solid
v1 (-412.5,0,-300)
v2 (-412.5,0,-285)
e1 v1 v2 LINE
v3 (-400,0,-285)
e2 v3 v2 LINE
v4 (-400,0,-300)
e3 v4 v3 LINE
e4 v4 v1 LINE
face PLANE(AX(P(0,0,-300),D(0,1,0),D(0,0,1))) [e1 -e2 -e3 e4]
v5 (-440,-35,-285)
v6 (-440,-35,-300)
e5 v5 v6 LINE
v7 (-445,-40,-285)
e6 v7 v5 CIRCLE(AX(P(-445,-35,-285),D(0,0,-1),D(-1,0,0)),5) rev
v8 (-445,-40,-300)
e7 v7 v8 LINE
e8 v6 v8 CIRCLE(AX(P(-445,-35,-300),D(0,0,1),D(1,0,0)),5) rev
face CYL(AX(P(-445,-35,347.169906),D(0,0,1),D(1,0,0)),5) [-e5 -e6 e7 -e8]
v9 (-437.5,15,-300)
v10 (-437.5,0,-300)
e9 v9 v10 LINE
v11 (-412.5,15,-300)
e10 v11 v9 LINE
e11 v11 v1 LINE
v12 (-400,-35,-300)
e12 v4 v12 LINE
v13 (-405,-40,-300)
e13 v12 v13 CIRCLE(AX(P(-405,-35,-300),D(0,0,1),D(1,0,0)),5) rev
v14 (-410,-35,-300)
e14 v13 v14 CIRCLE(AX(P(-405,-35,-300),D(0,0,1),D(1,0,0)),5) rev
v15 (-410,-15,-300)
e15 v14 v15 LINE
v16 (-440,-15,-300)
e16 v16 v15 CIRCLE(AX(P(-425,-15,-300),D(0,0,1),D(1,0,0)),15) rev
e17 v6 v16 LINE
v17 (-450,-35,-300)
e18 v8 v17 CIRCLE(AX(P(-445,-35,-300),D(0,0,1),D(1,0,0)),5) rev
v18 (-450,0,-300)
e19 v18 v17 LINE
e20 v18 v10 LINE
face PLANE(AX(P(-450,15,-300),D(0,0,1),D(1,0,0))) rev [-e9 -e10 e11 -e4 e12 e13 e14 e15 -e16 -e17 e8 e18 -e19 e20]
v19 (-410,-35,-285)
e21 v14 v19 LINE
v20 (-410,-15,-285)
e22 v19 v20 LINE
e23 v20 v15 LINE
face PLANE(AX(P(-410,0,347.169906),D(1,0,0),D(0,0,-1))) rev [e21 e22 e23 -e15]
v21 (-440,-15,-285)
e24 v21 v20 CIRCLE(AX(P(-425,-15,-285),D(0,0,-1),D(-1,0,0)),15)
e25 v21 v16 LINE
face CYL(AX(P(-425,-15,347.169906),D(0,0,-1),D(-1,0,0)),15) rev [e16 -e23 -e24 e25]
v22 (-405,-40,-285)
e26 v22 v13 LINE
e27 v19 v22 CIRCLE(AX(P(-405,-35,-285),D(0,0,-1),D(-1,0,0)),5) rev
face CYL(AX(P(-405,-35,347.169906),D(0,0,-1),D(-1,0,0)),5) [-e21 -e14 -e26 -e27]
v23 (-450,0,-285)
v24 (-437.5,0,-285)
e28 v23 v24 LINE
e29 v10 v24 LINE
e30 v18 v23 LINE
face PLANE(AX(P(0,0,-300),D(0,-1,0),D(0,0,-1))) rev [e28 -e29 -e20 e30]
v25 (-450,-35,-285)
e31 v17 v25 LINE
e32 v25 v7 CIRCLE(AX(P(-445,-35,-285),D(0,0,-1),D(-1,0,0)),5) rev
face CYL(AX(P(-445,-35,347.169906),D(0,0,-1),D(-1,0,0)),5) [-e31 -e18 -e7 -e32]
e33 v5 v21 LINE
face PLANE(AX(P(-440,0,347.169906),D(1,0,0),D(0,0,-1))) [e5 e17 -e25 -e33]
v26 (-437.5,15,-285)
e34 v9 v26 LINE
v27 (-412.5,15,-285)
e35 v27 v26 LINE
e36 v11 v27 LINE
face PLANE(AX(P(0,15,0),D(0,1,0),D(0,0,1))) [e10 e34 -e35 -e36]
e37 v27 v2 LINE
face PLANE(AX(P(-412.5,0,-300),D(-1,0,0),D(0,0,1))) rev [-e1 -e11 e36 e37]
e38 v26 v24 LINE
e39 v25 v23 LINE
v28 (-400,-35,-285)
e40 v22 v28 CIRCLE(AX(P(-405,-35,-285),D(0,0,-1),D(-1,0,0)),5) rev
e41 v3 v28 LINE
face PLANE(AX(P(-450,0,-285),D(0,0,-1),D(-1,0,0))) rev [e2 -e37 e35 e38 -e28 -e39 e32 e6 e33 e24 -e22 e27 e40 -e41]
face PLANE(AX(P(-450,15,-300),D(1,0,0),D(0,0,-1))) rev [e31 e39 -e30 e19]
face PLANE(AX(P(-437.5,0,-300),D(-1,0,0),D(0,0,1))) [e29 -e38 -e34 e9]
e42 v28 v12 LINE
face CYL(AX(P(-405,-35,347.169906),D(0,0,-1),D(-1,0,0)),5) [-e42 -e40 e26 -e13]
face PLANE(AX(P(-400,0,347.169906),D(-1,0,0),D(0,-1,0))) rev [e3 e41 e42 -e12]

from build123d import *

# Parameters (mm, degrees)
BOSS_EXTRUDE1_DEPTH             = 15
BOSS_EXTRUDE2_REACH             = 1239.023
BOSS_EXTRUDE2_DIRECTION_2_REACH = 1239.023
CUT_EXTRUDE2_DEPTH              = 1238.578280352
CUT_EXTRUDE2_DEPTH_BACK         = 1238.578280352
SKETCH5_W                       = 40
SKETCH5_H                       = 40
CUT_EXTRUDE3_DEPTH              = 1238.578280352
BOSS_EXTRUDE4_DEPTH             = 75
CUT_EXTRUDE4_DEPTH              = 1241.107934819
CUT_EXTRUDE4_DEPTH_BACK         = 1241.107934819
SKETCH8_W                       = 15
SKETCH8_H                       = 73.7
FILLET1_R                       = 5
CUT_EXTRUDE5_DEPTH              = 1241.107934819
CUT_EXTRUDE5_DEPTH_BACK         = 1241.107934819
SKETCH10_W                      = 12.5
SKETCH10_H                      = 15
CUT_EXTRUDE6_DEPTH              = 453.023229492


with BuildPart() as part:
    # Sketch1 → Boss-Extrude1 (new body)
    with BuildSketch(Plane(origin=(0, 0, 0), x_dir=(1, 0, 0), z_dir=(0, 1, 0))):
        Polygon((-450, 300), (-400, 300), (-200, 250), (600, 40), (1200, 40), (1200, -40), (600, -40), (-200, -250), (-400, -300), (-450, -300), align=None)
    extrude(amount=BOSS_EXTRUDE1_DEPTH)

    # Boss-Extrude2: up to this face of the body (flat: up to its plane)
    boss_extrude2_end = Plane(part.part.faces().sort_by_distance((-425, 7.5, 300))[0])
    # Sketch2 → Boss-Extrude2 (add, up to the picked face)
    with BuildSketch(Plane.XY, mode=Mode.PRIVATE) as boss_extrude2_sk1:
        with BuildLine():
            Line((-425, 0), (-450, 0))
            Line((-450, 0), (-450, -40))
            Line((-450, -40), (-440, -40))
            Line((-440, -40), (-440, -15))
            ThreePointArc((-440, -15), (-435.606601718, -4.393398282), (-425, 0))
        make_face()
    boss_extrude2_tool1 = split(extrude(boss_extrude2_sk1.sketch, amount=BOSS_EXTRUDE2_REACH, mode=Mode.PRIVATE), bisect_by=boss_extrude2_end, keep=Keep.BOTH, mode=Mode.PRIVATE)
    # Sketch2 → Boss-Extrude2 (add, up to the picked face)
    with BuildSketch(Plane.XY, mode=Mode.PRIVATE) as boss_extrude2_sk2:
        with BuildLine():
            Line((-400, 0), (-425, 0))
            ThreePointArc((-425, 0), (-414.393398282, -4.393398282), (-410, -15))
            Line((-410, -15), (-410, -40))
            Line((-410, -40), (-400, -40))
            Line((-400, -40), (-400, 0))
        make_face()
    boss_extrude2_tool2 = split(extrude(boss_extrude2_sk2.sketch, amount=BOSS_EXTRUDE2_REACH, mode=Mode.PRIVATE), bisect_by=boss_extrude2_end, keep=Keep.BOTH, mode=Mode.PRIVATE)
    add(boss_extrude2_tool1.solids().sort_by(Axis((-444.100555, -18.206662, 0), (0, 0, 1)))[0])
    add(boss_extrude2_tool2.solids().sort_by(Axis((-405.899445, -18.206662, 0), (0, 0, 1)))[0])

    # Boss-Extrude2 direction 2: up to this face of the body (flat: up to its plane)
    boss_extrude2_direction_2_end = Plane(part.part.faces().sort_by_distance((-425, 7.5, -300))[0])
    # Sketch2 → Boss-Extrude2 direction 2 (add, up to the picked face)
    with BuildSketch(Plane.XY, mode=Mode.PRIVATE) as boss_extrude2_direction_2_sk1:
        with BuildLine():
            Line((-425, 0), (-450, 0))
            Line((-450, 0), (-450, -40))
            Line((-450, -40), (-440, -40))
            Line((-440, -40), (-440, -15))
            ThreePointArc((-440, -15), (-435.606601718, -4.393398282), (-425, 0))
        make_face()
    boss_extrude2_direction_2_tool1 = split(extrude(boss_extrude2_direction_2_sk1.sketch, amount=-BOSS_EXTRUDE2_DIRECTION_2_REACH, mode=Mode.PRIVATE), bisect_by=boss_extrude2_direction_2_end, keep=Keep.BOTH, mode=Mode.PRIVATE)
    # Sketch2 → Boss-Extrude2 direction 2 (add, up to the picked face)
    with BuildSketch(Plane.XY, mode=Mode.PRIVATE) as boss_extrude2_direction_2_sk2:
        with BuildLine():
            Line((-400, 0), (-425, 0))
            ThreePointArc((-425, 0), (-414.393398282, -4.393398282), (-410, -15))
            Line((-410, -15), (-410, -40))
            Line((-410, -40), (-400, -40))
            Line((-400, -40), (-400, 0))
        make_face()
    boss_extrude2_direction_2_tool2 = split(extrude(boss_extrude2_direction_2_sk2.sketch, amount=-BOSS_EXTRUDE2_DIRECTION_2_REACH, mode=Mode.PRIVATE), bisect_by=boss_extrude2_direction_2_end, keep=Keep.BOTH, mode=Mode.PRIVATE)
    add(boss_extrude2_direction_2_tool1.solids().sort_by(Axis((-444.100555, -18.206662, 0), (0, 0, -1)))[0])
    add(boss_extrude2_direction_2_tool2.solids().sort_by(Axis((-405.899445, -18.206662, 0), (0, 0, -1)))[0])

    # Sketch4 → Cut-Extrude2 (cut, two sides: drawn at the far end of the back side and taken through both)
    with BuildSketch(Plane(origin=(0, 0, 0), x_dir=(1, 0, 0), z_dir=(0, 1, 0)).offset(-CUT_EXTRUDE2_DEPTH_BACK)):
        Polygon((-450, 230), (-400, 230), (-150, 167.5), (-150, -167.5), (-400, -230), (-450, -230), align=None)
        Polygon((-100, 155), (-100, -155), (520, 0), align=None)
    extrude(amount=CUT_EXTRUDE2_DEPTH + CUT_EXTRUDE2_DEPTH_BACK, mode=Mode.SUBTRACT)

    # Sketch5 → Cut-Extrude3 (cut, through all)
    with BuildSketch(Plane(origin=(0, 0, 0), x_dir=(0, 0, -1), z_dir=(1, 0, 0))):
        with Locations((-265, -20)):
            Rectangle(SKETCH5_W, SKETCH5_H)
        with Locations((265, -20)):
            Rectangle(SKETCH5_W, SKETCH5_H)
    extrude(amount=-CUT_EXTRUDE3_DEPTH, mode=Mode.SUBTRACT)

    # Sketch7 → Boss-Extrude4 (add)
    with BuildSketch(Plane(origin=(1200, 0, 0), x_dir=(0, 0, -1), z_dir=(1, 0, 0))):
        with BuildLine():
            Line((-87.5, 50), (-40, 15))
            Line((-40, 15), (40, 15))
            Line((40, 15), (87.5, 50))
            Line((87.5, 50), (87.5, 88.7))
            Line((87.5, 88.7), (58.5, 88.7))
            Line((58.5, 88.7), (58.5, 63.2))
            Line((58.5, 63.2), (48.5, 63.2))
            Line((48.5, 63.2), (48.5, 88.7))
            Line((48.5, 88.7), (20, 88.7))
            Line((20, 88.7), (20, 50))
            ThreePointArc((20, 50), (0, 30), (-20, 50))
            Line((-20, 50), (-20, 88.7))
            Line((-20, 88.7), (-63, 88.7))
            Line((-63, 88.7), (-63, 63.2))
            Line((-63, 63.2), (-73, 63.2))
            Line((-73, 63.2), (-73, 88.7))
            Line((-73, 88.7), (-87.5, 88.7))
            Line((-87.5, 88.7), (-87.5, 50))
        make_face()
    extrude(amount=-BOSS_EXTRUDE4_DEPTH)

    # Sketch8 → Cut-Extrude4 (cut, two sides: drawn at the far end of the back side and taken through both)
    with BuildSketch(Plane.XY.offset(-CUT_EXTRUDE4_DEPTH_BACK)):
        with Locations((1147.5, 51.85)):
            Rectangle(SKETCH8_W, SKETCH8_H)
        with Locations((1177.5, 51.85)):
            Rectangle(SKETCH8_W, SKETCH8_H)
    extrude(amount=CUT_EXTRUDE4_DEPTH + CUT_EXTRUDE4_DEPTH_BACK, mode=Mode.SUBTRACT)

    # Fillet1
    # the kernel refuses this fillet: 5 mm, written as the material it adds along each edge
    with BuildSketch(Plane(origin=(600, 0, -40), x_dir=(1, 0, 0), z_dir=(0, 1, 0)), Plane(origin=(600, 0, 40), x_dir=(-0.9672309653794254, 0, 0.25389812841213444), z_dir=(0, 1, 0))) as fillet1_piece_1:
        with BuildLine():
            CenterArc((FILLET1_R * 0.12906371081, FILLET1_R), FILLET1_R, 255.2916961, 14.7083039)
            Line((-FILLET1_R * 0.124834417602, FILLET1_R * 0.0327690346206), (0, 0))
            Line((0, 0), (FILLET1_R * 0.12906371081, 0))
        make_face()
    extrude(amount=15)
    with BuildSketch(Plane(origin=(-150, 15, -167.5), x_dir=(-0.9701425001453314, 0, -0.2425356250363347), z_dir=(0, -1, 0)), Plane(origin=(-150, 15, 167.5), x_dir=(0, 0, -1), z_dir=(0, -1, 0))) as fillet1_piece_2:
        with BuildLine():
            CenterArc((FILLET1_R * 0.780776406404, -FILLET1_R), FILLET1_R, 90, 75.963756532)
            Line((-FILLET1_R * 0.189366093741, -FILLET1_R * 0.757464374964), (0, 0))
            Line((0, 0), (FILLET1_R * 0.780776406404, 0))
        make_face()
    extrude(amount=15)
    with BuildSketch(Plane(origin=(-100, 15, -155), x_dir=(0.9701425001453314, 0, 0.24253562503633508), z_dir=(0, -1, 0)), Plane(origin=(-100, 0, 155), x_dir=(0.9701425001453319, 0, -0.24253562503633352), z_dir=(0, 1, 0))) as fillet1_piece_3:
        with BuildLine():
            CenterArc((FILLET1_R * 1.2807764064, FILLET1_R), FILLET1_R, 165.963756532, 104.036243468)
            Line((FILLET1_R * 0.310633906259, FILLET1_R * 1.24253562504), (0, 0))
            Line((0, 0), (FILLET1_R * 1.2807764064, 0))
        make_face()
    extrude(amount=15)
    with BuildSketch(Plane(origin=(520, 15, 0), x_dir=(-0.9701425001453318, 0, -0.24253562503633325), z_dir=(0, -1, 0))) as fillet1_piece_4:
        with BuildLine():
            CenterArc((FILLET1_R * 4, -FILLET1_R), FILLET1_R, 90, 151.927513064)
            Line((FILLET1_R * 3.52941176471, -FILLET1_R * 1.88235294118), (0, 0))
            Line((0, 0), (FILLET1_R * 4, 0))
        make_face()
    extrude(amount=15)
    # the kernel refuses this fillet: 5 mm, written as the material it takes off along each edge
    with BuildSketch(Plane(origin=(-440, -40, 217.5), x_dir=(0, 1, 0), z_dir=(0, 0, 1)), Plane(origin=(-400, -40, 217.5), x_dir=(0, 1, 0), z_dir=(0, 0, 1)), Plane(origin=(-440, -40, -312.5), x_dir=(0, 1, 0), z_dir=(0, 0, 1)), Plane(origin=(-450, -40, -312.5), x_dir=(1, 0, 0), z_dir=(0, 0, 1)), Plane(origin=(-400, -40, -312.5), x_dir=(0, 1, 0), z_dir=(0, 0, 1)), Plane(origin=(1152.5, 88.7, -20), x_dir=(0, 0, -1), z_dir=(-1, 0, 0)), Plane(origin=(1152.5, 88.7, -48.5), x_dir=(0, -1, 0), z_dir=(-1, 0, 0)), Plane(origin=(1152.5, 88.7, -58.5), x_dir=(0, 0, -1), z_dir=(-1, 0, 0)), Plane(origin=(1152.5, 88.7, -87.5), x_dir=(0, -1, 0), z_dir=(-1, 0, 0)), Plane(origin=(1152.5, 88.7, 87.5), x_dir=(0, 0, -1), z_dir=(-1, 0, 0)), Plane(origin=(1152.5, 88.7, 73), x_dir=(0, -1, 0), z_dir=(-1, 0, 0)), Plane(origin=(1152.5, 88.7, 63), x_dir=(0, 0, -1), z_dir=(-1, 0, 0)), Plane(origin=(1152.5, 88.7, 20), x_dir=(0, -1, 0), z_dir=(-1, 0, 0)), Plane(origin=(1182.5, 88.7, 20), x_dir=(0, -1, 0), z_dir=(-1, 0, 0)), Plane(origin=(1212.5, 88.7, 20), x_dir=(0, -1, 0), z_dir=(-1, 0, 0)), Plane(origin=(1182.5, 88.7, 63), x_dir=(0, 0, -1), z_dir=(-1, 0, 0)), Plane(origin=(1212.5, 88.7, 63), x_dir=(0, 0, -1), z_dir=(-1, 0, 0)), Plane(origin=(1182.5, 88.7, 73), x_dir=(0, -1, 0), z_dir=(-1, 0, 0)), Plane(origin=(1212.5, 88.7, 73), x_dir=(0, -1, 0), z_dir=(-1, 0, 0)), Plane(origin=(1182.5, 88.7, -87.5), x_dir=(0, -1, 0), z_dir=(-1, 0, 0)), Plane(origin=(1212.5, 88.7, -87.5), x_dir=(0, -1, 0), z_dir=(-1, 0, 0)), Plane(origin=(1182.5, 88.7, -58.5), x_dir=(0, 0, -1), z_dir=(-1, 0, 0)), Plane(origin=(1212.5, 88.7, -58.5), x_dir=(0, 0, -1), z_dir=(-1, 0, 0)), Plane(origin=(1182.5, 88.7, -48.5), x_dir=(0, -1, 0), z_dir=(-1, 0, 0)), Plane(origin=(1212.5, 88.7, -48.5), x_dir=(0, -1, 0), z_dir=(-1, 0, 0)), Plane(origin=(1182.5, 88.7, -20), x_dir=(0, 0, -1), z_dir=(-1, 0, 0)), Plane(origin=(1212.5, 88.7, -20), x_dir=(0, 0, -1), z_dir=(-1, 0, 0)), Plane(origin=(-410, -40, 312.5), x_dir=(0, 1, 0), z_dir=(0, 0, -1)), Plane(origin=(-410, -40, -217.5), x_dir=(0, 1, 0), z_dir=(0, 0, -1))) as fillet1_2_piece_1:
        with BuildLine():
            CenterArc((FILLET1_R, FILLET1_R), FILLET1_R, 180, 90)
            Line((0, FILLET1_R), (0, 0))
            Line((0, 0), (FILLET1_R, 0))
        make_face()
    extrude(amount=40, mode=Mode.SUBTRACT)
    with BuildSketch(Plane(origin=(-450, -40, 217.5), x_dir=(0, 1, 0), z_dir=(0, 0, 1)), Plane(origin=(-410, -40, 257.5), x_dir=(1, 0, 0), z_dir=(0, 0, -1)), Plane(origin=(-410, -40, -272.5), x_dir=(1, 0, 0), z_dir=(0, 0, -1)), Plane(origin=(1182.5, 88.7, 87.5), x_dir=(0, -1, 0), z_dir=(-1, 0, 0)), Plane(origin=(1212.5, 88.7, 87.5), x_dir=(0, -1, 0), z_dir=(-1, 0, 0)), Plane(origin=(-400, -40, 272.5), x_dir=(-1, 0, 0), z_dir=(0, 0, 1)), Plane(origin=(-450, -40, 272.5), x_dir=(0, 1, 0), z_dir=(0, 0, 1)), Plane(origin=(-440, -40, 272.5), x_dir=(-1, 0, 0), z_dir=(0, 0, 1)), Plane(origin=(-440, -40, -257.5), x_dir=(-1, 0, 0), z_dir=(0, 0, 1)), Plane(origin=(-450, -40, -257.5), x_dir=(0, 1, 0), z_dir=(0, 0, 1)), Plane(origin=(-400, -40, -257.5), x_dir=(-1, 0, 0), z_dir=(0, 0, 1))) as fillet1_2_piece_2:
        with BuildLine():
            CenterArc((FILLET1_R, -FILLET1_R), FILLET1_R, 90, 90)
            Line((0, -FILLET1_R), (0, 0))
            Line((0, 0), (FILLET1_R, 0))
        make_face()
    extrude(amount=40, mode=Mode.SUBTRACT)
    with BuildSketch(Plane(origin=(1146.316347002, 50, -87.5), x_dir=(0, -0.5931990380498489, 0.8050558373533688), z_dir=(-1, 0, 0)), Plane(origin=(1176.316347002, 50, -87.5), x_dir=(0, -0.5931990380498489, 0.8050558373533688), z_dir=(-1, 0, 0)), Plane(origin=(1206.316347002, 50, -87.5), x_dir=(0, -0.5931990380498489, 0.8050558373533688), z_dir=(-1, 0, 0))) as fillet1_2_piece_3:
        with BuildLine():
            CenterArc((FILLET1_R * 0.505307760127, FILLET1_R), FILLET1_R, 216.384351816, 53.615648184)
            Line((-FILLET1_R * 0.299748077226, FILLET1_R * 0.40680096195), (0, 0))
            Line((0, 0), (FILLET1_R * 0.505307760127, 0))
        make_face()
    extrude(amount=27.632694003, mode=Mode.SUBTRACT)
    with BuildSketch(Plane(origin=(1146.316347002, 50, 87.5), x_dir=(0, -0.5931990380498499, -0.8050558373533683), z_dir=(-1, 0, 0)), Plane(origin=(1176.316347002, 50, 87.5), x_dir=(0, -0.5931990380498499, -0.8050558373533683), z_dir=(-1, 0, 0)), Plane(origin=(1206.316347002, 50, 87.5), x_dir=(0, -0.5931990380498499, -0.8050558373533683), z_dir=(-1, 0, 0))) as fillet1_2_piece_4:
        with BuildLine():
            CenterArc((FILLET1_R * 0.505307760127, -FILLET1_R), FILLET1_R, 90, 53.615648184)
            Line((-FILLET1_R * 0.299748077226, -FILLET1_R * 0.40680096195), (0, 0))
            Line((0, 0), (FILLET1_R * 0.505307760127, 0))
        make_face()
    extrude(amount=27.632694003, mode=Mode.SUBTRACT)

    # Sketch9 → Cut-Extrude5 (cut, two sides: drawn at the far end of the back side and taken through both)
    with BuildSketch(Plane(origin=(0, 0, 0), x_dir=(1, 0, 0), z_dir=(0, 1, 0)).offset(-CUT_EXTRUDE5_DEPTH_BACK)):
        Polygon((-450, 285), (-450, -300), (1200, -300), (1200, 300), (-400, 300), (-400, 285), align=None)
    extrude(amount=CUT_EXTRUDE5_DEPTH + CUT_EXTRUDE5_DEPTH_BACK, mode=Mode.SUBTRACT)

    # Sketch10 → Cut-Extrude6 (cut, through all)
    with BuildSketch(Plane.XY.offset(-285)):
        with Locations((-443.75, 7.5)):
            Rectangle(SKETCH10_W, SKETCH10_H)
        with Locations((-406.25, 7.5)):
            Rectangle(SKETCH10_W, SKETCH10_H)
    extrude(amount=-CUT_EXTRUDE6_DEPTH, mode=Mode.SUBTRACT)


solid = part.part
